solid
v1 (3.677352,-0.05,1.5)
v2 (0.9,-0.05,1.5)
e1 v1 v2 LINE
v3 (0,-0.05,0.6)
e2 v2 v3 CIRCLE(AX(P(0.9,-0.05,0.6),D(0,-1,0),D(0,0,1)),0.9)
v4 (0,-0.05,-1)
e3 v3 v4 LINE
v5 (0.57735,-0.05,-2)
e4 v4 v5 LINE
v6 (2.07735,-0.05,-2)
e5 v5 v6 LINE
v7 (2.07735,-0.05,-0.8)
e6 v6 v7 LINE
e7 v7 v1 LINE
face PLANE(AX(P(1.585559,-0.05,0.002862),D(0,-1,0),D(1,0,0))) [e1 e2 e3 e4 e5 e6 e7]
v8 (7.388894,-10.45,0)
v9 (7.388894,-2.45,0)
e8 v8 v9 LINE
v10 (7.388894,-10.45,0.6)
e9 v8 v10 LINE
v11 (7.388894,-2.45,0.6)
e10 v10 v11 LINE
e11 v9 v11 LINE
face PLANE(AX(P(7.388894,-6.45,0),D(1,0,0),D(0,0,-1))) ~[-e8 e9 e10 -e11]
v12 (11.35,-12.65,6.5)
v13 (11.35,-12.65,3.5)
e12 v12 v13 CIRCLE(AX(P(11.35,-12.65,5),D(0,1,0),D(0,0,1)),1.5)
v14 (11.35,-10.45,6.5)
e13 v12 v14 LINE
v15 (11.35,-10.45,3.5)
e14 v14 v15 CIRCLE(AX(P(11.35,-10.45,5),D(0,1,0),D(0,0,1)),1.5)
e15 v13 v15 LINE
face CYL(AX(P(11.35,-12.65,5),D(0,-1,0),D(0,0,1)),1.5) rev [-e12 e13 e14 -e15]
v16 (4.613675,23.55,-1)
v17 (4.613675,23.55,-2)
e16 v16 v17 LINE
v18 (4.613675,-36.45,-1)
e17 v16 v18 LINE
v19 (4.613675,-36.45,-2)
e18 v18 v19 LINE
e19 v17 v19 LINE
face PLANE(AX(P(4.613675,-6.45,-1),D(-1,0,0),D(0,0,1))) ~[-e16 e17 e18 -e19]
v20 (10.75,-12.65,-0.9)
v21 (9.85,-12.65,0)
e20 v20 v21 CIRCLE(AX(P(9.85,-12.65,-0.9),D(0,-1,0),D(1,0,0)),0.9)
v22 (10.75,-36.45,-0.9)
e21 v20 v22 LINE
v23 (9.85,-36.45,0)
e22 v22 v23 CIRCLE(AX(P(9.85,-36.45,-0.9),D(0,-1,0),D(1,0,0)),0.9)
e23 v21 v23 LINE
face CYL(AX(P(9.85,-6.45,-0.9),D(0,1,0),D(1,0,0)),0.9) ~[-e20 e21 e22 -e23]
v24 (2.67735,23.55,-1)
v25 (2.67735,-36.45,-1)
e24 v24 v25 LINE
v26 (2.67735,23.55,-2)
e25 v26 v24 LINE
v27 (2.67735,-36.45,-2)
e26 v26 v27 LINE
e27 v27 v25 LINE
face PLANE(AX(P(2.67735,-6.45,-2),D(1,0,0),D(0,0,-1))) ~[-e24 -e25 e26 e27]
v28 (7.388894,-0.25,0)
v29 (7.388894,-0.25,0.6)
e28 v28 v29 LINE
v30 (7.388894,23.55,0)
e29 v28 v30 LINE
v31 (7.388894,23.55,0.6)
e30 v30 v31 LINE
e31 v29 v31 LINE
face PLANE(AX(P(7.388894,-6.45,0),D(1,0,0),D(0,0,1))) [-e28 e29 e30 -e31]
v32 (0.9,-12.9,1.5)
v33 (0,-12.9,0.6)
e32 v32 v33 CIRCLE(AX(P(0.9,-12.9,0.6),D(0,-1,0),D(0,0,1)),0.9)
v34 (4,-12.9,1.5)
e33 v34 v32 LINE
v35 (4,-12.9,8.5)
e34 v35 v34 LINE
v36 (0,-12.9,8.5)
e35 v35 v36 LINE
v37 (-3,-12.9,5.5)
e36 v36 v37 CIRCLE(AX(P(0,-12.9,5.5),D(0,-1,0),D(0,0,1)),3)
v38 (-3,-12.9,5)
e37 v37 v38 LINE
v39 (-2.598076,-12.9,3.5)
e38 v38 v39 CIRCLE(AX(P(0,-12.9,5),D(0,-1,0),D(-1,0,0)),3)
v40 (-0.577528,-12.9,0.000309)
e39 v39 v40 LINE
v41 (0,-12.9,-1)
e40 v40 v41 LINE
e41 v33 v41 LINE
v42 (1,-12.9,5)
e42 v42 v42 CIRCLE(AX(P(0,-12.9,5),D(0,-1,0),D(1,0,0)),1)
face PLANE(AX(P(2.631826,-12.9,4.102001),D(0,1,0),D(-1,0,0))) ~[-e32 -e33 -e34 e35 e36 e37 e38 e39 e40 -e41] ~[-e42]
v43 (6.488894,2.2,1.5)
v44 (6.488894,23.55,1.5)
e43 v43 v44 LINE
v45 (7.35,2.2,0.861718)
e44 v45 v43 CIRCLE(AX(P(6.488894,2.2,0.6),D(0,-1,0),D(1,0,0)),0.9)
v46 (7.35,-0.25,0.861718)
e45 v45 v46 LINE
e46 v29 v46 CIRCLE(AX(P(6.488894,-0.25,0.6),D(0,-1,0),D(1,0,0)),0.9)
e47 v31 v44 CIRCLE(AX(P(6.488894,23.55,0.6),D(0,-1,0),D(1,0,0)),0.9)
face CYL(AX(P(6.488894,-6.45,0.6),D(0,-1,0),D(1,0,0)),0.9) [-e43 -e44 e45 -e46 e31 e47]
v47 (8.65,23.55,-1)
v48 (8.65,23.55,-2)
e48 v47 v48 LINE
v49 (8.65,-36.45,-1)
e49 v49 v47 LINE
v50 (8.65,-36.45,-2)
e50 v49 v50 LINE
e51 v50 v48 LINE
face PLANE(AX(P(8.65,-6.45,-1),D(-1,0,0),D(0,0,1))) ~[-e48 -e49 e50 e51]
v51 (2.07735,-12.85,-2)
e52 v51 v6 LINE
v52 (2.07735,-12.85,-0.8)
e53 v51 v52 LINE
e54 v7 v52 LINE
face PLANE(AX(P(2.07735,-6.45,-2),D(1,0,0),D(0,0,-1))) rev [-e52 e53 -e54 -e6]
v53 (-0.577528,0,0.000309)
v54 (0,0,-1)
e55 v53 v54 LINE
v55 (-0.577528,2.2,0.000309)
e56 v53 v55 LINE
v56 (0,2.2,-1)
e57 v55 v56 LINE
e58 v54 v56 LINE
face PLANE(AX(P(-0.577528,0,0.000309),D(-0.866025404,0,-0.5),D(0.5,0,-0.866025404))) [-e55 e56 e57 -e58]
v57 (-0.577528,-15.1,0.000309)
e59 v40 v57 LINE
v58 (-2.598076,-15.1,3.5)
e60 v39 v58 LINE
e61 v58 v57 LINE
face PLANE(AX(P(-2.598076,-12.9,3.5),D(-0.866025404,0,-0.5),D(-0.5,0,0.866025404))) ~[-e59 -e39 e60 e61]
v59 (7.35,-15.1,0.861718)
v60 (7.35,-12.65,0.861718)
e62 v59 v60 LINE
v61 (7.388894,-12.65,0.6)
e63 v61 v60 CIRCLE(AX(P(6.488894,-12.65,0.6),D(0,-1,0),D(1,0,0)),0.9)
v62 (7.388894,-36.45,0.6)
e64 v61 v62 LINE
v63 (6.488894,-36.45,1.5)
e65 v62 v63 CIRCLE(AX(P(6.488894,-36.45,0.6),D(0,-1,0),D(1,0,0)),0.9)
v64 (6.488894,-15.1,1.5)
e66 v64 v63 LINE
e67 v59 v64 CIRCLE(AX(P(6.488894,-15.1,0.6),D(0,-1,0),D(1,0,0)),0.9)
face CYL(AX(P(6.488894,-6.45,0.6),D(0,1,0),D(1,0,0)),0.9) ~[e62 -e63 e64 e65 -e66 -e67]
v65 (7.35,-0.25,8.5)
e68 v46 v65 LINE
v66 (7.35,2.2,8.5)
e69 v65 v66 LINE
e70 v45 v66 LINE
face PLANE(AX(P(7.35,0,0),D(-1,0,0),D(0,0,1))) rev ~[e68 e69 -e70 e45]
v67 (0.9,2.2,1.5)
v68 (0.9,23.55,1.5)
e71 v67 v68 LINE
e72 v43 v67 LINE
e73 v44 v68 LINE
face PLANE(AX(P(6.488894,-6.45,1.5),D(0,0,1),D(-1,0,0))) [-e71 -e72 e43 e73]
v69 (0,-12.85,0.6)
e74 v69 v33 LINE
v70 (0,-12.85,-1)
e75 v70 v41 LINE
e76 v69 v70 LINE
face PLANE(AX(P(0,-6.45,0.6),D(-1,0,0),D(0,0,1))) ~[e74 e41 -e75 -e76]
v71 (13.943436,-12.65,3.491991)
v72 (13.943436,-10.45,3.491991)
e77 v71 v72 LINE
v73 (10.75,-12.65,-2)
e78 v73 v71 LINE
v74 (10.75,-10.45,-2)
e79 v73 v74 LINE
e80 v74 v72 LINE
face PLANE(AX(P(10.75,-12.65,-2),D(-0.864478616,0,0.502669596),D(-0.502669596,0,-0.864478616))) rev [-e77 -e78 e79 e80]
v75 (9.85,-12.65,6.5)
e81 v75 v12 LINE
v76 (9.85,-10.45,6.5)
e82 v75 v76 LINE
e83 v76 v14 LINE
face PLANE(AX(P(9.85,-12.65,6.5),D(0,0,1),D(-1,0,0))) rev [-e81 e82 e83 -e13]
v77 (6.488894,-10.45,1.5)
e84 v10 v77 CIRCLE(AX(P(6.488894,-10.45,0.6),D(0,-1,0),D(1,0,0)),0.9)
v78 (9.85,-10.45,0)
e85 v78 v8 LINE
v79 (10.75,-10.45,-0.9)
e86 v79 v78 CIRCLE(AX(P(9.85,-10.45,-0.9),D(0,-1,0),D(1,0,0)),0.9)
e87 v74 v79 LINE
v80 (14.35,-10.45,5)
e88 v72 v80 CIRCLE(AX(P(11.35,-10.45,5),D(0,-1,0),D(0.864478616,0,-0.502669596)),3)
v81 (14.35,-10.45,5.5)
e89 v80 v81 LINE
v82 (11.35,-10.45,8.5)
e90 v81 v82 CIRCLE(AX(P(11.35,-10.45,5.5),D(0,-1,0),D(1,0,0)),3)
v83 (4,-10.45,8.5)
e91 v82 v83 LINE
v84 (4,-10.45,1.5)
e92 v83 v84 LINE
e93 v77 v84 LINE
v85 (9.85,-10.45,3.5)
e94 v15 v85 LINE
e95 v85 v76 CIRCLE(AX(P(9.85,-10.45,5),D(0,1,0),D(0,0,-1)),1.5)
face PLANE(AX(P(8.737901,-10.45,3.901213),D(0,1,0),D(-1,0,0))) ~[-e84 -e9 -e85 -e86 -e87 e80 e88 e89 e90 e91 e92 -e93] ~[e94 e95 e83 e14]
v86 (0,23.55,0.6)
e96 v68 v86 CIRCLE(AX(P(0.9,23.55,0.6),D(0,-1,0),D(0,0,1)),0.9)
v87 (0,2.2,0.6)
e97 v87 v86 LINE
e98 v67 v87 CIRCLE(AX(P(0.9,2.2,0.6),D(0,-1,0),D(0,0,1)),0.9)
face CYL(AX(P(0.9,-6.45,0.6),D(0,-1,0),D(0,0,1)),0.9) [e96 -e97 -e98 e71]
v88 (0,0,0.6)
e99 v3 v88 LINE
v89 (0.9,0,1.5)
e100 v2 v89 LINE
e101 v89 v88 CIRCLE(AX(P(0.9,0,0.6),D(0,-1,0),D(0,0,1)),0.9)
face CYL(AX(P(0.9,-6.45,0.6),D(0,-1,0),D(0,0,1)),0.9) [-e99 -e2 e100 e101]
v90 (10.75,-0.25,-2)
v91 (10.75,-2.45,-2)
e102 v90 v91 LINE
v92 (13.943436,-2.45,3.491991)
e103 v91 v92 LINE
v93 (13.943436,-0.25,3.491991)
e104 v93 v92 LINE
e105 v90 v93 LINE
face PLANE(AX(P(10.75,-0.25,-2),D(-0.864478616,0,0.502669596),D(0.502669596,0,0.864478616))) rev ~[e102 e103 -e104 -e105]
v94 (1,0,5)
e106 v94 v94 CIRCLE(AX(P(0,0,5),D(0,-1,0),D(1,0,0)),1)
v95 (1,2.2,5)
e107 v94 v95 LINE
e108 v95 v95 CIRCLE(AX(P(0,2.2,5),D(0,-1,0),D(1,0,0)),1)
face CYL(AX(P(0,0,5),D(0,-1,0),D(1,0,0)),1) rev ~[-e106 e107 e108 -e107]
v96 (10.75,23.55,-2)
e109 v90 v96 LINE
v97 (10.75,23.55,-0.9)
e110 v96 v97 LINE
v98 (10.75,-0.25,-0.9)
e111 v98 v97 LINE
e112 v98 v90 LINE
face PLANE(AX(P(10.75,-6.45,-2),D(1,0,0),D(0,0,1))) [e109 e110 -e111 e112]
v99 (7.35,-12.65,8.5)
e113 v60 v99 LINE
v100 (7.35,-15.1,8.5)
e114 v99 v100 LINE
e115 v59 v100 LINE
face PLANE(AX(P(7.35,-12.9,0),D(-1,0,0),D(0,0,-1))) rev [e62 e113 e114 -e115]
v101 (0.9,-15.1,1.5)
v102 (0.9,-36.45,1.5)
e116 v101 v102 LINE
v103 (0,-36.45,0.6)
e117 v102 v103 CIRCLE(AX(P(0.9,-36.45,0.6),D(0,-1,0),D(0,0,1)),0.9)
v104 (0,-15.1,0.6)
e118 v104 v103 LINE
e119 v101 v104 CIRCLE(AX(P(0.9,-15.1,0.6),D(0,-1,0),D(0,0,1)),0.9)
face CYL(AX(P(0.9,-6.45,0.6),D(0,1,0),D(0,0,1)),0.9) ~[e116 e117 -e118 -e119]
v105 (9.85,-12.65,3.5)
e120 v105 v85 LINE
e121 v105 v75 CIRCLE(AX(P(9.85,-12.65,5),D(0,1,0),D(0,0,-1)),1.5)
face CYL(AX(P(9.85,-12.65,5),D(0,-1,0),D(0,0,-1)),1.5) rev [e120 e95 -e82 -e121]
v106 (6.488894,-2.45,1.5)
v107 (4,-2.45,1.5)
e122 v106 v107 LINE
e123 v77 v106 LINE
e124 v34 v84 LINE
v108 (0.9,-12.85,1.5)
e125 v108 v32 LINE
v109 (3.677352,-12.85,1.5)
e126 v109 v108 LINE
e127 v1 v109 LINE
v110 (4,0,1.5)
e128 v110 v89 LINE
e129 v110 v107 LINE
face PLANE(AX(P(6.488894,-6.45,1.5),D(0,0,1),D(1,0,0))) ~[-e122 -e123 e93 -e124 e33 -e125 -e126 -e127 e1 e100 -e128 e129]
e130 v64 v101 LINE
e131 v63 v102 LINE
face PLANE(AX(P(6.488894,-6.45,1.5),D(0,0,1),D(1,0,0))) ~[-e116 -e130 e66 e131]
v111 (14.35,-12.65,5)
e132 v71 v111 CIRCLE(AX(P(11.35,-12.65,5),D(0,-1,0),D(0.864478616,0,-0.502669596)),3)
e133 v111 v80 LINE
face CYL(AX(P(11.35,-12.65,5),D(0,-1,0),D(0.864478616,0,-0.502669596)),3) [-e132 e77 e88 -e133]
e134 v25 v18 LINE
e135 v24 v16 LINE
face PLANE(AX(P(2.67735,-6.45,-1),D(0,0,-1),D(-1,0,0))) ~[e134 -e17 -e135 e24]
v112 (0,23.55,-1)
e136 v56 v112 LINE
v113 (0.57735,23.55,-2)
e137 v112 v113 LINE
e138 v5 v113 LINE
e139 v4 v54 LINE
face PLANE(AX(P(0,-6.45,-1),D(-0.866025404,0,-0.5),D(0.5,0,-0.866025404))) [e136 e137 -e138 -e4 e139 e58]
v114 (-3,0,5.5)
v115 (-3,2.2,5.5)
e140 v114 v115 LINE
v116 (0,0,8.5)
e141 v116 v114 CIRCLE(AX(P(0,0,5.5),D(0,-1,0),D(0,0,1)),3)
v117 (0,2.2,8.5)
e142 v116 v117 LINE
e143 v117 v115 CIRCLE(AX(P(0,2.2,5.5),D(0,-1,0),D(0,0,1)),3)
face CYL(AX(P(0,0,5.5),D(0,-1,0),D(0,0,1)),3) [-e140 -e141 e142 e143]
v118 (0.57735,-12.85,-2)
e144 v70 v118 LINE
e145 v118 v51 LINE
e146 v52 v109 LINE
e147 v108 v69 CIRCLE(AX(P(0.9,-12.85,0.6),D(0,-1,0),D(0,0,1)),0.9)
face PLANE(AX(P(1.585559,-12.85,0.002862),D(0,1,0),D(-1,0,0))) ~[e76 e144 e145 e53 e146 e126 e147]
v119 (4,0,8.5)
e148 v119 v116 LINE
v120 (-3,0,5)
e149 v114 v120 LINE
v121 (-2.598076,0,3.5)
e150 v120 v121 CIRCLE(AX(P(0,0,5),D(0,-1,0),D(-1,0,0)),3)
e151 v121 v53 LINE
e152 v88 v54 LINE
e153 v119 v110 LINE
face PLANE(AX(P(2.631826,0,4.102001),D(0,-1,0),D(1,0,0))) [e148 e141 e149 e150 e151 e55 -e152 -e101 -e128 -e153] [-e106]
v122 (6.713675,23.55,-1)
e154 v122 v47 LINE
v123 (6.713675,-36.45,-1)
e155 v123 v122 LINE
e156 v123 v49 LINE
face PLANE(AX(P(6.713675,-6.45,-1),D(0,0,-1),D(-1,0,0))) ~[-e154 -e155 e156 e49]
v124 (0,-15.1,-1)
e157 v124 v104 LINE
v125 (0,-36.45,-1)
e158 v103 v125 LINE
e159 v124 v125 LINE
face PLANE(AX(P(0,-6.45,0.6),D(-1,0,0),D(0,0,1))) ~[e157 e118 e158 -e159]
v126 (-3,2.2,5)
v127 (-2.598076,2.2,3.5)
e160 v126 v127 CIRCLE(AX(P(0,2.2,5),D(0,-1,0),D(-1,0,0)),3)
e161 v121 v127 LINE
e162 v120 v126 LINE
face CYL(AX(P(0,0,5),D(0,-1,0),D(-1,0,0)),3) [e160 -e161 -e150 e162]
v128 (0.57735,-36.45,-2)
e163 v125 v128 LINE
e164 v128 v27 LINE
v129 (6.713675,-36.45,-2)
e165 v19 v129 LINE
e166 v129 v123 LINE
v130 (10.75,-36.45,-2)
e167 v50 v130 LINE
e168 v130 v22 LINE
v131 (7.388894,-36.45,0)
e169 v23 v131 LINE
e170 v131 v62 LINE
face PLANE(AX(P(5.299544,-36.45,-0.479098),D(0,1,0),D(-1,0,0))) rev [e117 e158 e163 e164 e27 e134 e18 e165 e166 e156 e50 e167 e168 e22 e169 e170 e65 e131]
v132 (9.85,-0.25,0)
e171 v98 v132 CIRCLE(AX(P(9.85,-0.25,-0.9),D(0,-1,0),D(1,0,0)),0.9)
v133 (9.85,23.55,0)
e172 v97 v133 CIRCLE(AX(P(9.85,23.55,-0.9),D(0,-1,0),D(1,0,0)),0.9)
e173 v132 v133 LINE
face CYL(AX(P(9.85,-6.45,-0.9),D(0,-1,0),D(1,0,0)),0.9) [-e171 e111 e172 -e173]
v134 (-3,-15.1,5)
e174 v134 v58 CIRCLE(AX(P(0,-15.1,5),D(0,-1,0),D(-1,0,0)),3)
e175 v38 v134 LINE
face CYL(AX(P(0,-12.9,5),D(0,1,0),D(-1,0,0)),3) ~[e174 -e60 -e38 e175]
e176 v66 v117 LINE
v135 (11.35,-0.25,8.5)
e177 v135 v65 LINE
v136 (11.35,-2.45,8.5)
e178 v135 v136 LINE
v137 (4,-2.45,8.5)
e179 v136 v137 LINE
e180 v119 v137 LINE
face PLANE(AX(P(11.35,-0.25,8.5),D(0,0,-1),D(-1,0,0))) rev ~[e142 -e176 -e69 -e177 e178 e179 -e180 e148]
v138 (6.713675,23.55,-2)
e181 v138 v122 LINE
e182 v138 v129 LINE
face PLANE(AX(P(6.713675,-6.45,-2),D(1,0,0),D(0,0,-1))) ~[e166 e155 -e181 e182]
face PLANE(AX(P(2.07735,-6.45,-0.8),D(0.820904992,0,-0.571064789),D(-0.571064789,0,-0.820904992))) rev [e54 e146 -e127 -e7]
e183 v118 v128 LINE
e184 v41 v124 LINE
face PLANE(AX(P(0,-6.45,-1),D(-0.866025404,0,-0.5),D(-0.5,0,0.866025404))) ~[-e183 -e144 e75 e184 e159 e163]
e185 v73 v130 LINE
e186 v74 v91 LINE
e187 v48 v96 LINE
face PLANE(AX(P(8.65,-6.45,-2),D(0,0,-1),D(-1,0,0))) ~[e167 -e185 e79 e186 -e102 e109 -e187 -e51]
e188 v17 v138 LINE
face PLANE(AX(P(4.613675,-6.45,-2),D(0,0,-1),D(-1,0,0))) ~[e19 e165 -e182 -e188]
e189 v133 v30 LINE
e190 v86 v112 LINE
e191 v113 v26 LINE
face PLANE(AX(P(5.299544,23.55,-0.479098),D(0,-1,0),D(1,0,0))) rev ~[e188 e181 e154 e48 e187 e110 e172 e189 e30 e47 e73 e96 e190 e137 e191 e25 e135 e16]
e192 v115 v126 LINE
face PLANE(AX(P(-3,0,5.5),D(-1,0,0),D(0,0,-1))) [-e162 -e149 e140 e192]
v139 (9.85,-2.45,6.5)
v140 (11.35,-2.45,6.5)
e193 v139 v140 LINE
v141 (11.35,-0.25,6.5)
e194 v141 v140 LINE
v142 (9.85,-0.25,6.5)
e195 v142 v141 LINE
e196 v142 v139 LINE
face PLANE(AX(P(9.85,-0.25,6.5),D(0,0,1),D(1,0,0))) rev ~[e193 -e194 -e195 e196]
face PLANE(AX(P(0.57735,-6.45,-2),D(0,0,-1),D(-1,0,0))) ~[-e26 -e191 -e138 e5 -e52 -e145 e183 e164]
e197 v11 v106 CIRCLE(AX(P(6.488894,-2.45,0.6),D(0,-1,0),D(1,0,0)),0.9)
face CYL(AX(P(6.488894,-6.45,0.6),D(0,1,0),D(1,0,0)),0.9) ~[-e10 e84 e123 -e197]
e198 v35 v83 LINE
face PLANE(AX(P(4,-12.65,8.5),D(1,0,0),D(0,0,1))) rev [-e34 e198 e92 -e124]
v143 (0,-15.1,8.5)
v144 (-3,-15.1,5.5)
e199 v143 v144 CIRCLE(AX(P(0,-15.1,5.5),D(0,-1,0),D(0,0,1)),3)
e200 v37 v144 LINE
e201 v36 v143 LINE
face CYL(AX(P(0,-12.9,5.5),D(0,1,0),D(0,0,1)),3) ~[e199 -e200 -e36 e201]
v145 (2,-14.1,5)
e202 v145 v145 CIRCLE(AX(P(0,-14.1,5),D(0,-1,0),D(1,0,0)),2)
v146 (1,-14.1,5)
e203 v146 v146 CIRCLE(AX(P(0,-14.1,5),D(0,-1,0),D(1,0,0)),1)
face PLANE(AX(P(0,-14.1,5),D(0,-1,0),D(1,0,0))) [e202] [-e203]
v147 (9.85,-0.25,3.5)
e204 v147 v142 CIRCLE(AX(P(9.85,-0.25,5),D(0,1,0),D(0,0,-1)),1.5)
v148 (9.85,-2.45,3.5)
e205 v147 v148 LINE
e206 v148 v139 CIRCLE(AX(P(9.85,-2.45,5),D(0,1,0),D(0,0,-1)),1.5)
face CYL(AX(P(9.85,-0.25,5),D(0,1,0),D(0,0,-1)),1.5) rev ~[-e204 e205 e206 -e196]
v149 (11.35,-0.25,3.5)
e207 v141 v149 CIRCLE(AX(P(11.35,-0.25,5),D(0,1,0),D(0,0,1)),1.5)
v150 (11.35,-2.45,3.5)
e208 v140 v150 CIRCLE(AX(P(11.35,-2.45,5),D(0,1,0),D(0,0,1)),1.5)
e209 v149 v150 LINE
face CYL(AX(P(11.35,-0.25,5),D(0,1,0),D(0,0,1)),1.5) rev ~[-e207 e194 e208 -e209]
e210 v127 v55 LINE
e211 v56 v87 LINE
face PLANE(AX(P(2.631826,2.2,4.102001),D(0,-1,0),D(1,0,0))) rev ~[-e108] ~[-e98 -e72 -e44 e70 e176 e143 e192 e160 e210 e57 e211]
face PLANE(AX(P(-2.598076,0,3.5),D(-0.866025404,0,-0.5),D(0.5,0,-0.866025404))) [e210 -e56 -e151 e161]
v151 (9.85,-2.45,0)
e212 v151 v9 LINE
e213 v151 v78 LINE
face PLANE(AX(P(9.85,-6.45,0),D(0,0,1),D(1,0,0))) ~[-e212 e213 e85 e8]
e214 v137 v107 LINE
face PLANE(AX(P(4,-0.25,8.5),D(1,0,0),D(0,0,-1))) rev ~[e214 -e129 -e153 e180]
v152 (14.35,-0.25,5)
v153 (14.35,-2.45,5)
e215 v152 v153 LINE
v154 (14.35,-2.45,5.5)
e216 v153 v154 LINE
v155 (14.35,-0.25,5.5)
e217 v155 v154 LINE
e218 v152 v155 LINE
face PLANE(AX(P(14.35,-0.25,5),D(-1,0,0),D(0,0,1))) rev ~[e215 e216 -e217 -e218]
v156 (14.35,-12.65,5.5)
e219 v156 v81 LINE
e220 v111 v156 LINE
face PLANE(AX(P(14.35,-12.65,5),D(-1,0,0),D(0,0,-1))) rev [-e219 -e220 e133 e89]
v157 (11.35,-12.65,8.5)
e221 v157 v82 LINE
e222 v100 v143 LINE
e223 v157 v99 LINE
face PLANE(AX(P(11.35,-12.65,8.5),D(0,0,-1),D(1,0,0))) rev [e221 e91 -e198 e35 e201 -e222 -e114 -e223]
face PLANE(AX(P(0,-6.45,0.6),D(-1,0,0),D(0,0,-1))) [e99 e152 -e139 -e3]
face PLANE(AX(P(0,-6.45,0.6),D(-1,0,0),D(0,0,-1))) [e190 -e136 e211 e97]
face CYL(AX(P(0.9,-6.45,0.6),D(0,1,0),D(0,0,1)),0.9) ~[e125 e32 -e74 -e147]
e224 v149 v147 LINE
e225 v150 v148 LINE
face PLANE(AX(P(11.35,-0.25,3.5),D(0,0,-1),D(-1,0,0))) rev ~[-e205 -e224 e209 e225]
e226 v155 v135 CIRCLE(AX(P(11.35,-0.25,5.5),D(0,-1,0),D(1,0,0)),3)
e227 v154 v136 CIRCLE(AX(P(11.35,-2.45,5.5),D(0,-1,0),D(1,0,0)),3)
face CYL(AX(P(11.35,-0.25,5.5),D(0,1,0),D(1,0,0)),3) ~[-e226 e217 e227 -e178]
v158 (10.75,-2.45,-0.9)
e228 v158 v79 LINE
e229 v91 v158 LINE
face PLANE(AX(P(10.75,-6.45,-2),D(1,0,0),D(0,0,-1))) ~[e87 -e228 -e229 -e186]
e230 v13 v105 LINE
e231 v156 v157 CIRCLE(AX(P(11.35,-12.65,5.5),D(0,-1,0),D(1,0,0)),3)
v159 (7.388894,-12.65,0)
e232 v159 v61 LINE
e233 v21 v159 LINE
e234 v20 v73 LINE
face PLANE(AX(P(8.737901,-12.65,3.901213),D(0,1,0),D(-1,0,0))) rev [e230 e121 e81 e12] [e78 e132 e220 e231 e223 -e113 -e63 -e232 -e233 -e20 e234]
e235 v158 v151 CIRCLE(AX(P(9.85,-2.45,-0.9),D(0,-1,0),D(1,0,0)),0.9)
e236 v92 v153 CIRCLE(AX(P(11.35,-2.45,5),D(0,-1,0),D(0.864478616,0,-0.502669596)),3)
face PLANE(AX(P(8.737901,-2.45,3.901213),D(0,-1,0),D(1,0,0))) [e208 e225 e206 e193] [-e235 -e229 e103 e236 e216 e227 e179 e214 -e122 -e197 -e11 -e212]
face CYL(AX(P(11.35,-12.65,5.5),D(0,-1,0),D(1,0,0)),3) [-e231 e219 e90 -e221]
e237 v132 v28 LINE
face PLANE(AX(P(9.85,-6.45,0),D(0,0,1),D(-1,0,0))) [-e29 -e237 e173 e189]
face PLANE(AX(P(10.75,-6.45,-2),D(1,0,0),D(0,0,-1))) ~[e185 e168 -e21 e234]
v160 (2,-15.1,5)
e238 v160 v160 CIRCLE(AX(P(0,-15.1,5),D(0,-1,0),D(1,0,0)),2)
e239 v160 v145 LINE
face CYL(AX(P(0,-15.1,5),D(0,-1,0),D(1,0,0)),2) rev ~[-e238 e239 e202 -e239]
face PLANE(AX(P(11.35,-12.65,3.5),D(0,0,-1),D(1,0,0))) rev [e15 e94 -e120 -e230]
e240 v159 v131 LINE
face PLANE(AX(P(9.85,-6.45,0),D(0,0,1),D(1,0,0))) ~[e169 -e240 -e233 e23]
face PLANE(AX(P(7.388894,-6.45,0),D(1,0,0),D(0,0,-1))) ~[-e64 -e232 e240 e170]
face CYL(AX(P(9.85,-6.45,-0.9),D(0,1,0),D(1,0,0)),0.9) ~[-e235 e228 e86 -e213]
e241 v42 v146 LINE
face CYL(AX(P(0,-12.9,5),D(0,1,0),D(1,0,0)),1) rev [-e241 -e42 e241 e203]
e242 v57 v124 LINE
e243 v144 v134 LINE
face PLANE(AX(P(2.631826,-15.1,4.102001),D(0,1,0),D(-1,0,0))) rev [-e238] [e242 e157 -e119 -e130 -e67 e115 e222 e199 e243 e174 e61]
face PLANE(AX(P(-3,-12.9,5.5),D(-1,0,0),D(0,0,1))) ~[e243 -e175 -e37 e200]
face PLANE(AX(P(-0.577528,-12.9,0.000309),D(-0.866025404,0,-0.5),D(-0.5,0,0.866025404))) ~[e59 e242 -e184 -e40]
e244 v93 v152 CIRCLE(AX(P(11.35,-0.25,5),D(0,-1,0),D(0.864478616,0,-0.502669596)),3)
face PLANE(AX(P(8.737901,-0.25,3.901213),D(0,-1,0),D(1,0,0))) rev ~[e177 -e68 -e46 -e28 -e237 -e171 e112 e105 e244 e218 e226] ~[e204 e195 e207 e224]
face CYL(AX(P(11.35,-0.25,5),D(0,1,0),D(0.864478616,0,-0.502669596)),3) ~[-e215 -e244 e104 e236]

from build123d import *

# Parameters (mm, degrees)
F1_R      = 1
F2_DEPTH  = 2.2
F4_DEPTH  = 0.25
F6_DEPTH  = 2.2
F9_DEPTH  = 30
F11_DEPTH = 6.4
F13_R     = 2
F13_R_2   = 1
F14_DEPTH = 1


# Not quite as in the source:
# - a feature names something its author has since deleted; it is built from what else it names


with BuildPart() as f2:
    # F1 (on Front) → F2 (new body)
    with BuildSketch(Plane.XZ):
        with BuildLine():
            Line((7.35, 2), (7.35, 8.5))
            Line((7.35, 8.5), (0, 8.5))
            ThreePointArc((0, 8.5), (-2.1213203436, 7.6213203436), (-3, 5.5))
            Line((-3, 5.5), (-3, 5))
            ThreePointArc((-3, 5), (-2.8977774789, 4.2235428647), (-2.5980762114, 3.5))
            Line((-2.5980762114, 3.5), (-0.5775284417, 0.0003086038))
            Line((-0.5775284417, 0.0003086038), (0, -1))
            Line((0, -1), (0, 0))
            Line((0, 0), (2, 0))
            Line((2, 0), (7.35, 0))
            Line((7.35, 0), (7.35, 2))
        make_face()
        with Locations((0, 5)):
            Circle(F1_R, mode=Mode.SUBTRACT)
    extrude(amount=-F2_DEPTH)

    # F3 (on Front) → F4 (join)
    with BuildSketch(Plane.XZ):
        Polygon((7.35, 8.5), (4, 8.5), (4, 2), (4, 0), (7.35, 0), (7.35, 2), align=None)
    extrude(amount=F4_DEPTH)

    # F5 (on face) → F6 (join)
    with BuildSketch(Plane.XZ.offset(0.25)):
        with BuildLine():
            ThreePointArc((13.9434358481, 3.491991213), (14.2465762155, 4.2190734812), (14.35, 5))
            Line((14.35, 5), (14.35, 5.5))
            ThreePointArc((14.35, 5.5), (13.4713203436, 7.6213203436), (11.35, 8.5))
            Line((11.35, 8.5), (4, 8.5))
            Line((4, 8.5), (4, 2))
            Line((4, 2), (4, 0))
            Line((4, 0), (7.3888939805, 0))
            Line((7.3888939805, 0), (10.75, -1))
            Line((10.75, -1), (10.75, -2))
            Line((10.75, -2), (13.9434358481, 3.491991213))
        make_face()
        with BuildLine():
            Line((11.35, 3.5), (9.85, 3.5))
            ThreePointArc((9.85, 3.5), (8.35, 5), (9.85, 6.5))
            Line((9.85, 6.5), (11.35, 6.5))
            ThreePointArc((11.35, 6.5), (12.85, 5), (11.35, 3.5))
        make_face(mode=Mode.SUBTRACT)
    extrude(amount=F6_DEPTH)

    # F8 (on offset) → F9 (join)
    with BuildSketch(Plane.XZ.offset(6.45)):
        with BuildLine():
            Line((10.75, -2), (10.75, -1))
            Line((10.75, -1), (10.75, -0.9))
            ThreePointArc((10.75, -0.9), (10.4863961031, -0.2636038969), (9.85, 0))
            Line((9.85, 0), (7.3888939805, 0))
            Line((7.3888939805, 0), (7.3888939805, 0.6))
            ThreePointArc((7.3888939805, 0.6), (7.1252900836, 1.2363961031), (6.4888939805, 1.5))
            Line((6.4888939805, 1.5), (0.9, 1.5))
            ThreePointArc((0.9, 1.5), (0.2636038969, 1.2363961031), (0, 0.6))
            Line((0, 0.6), (0, -1))
            Line((0, -1), (0.5773502692, -2))
            Line((0.5773502692, -2), (2.6773502692, -2))
            Line((2.6773502692, -2), (2.6773502692, -1))
            Line((2.6773502692, -1), (4.6136751346, -1))
            Line((4.6136751346, -1), (4.6136751346, -2))
            Line((4.6136751346, -2), (6.7136751346, -2))
            Line((6.7136751346, -2), (6.7136751346, -1))
            Line((6.7136751346, -1), (8.65, -1))
            Line((8.65, -1), (8.65, -2))
            Line((8.65, -2), (10.75, -2))
        make_face()
    extrude(amount=-F9_DEPTH)

    # F10 (on offset) → F11 (cut)
    with BuildSketch(Plane.XZ.offset(6.45)):
        with BuildLine():
            ThreePointArc((0.9, 1.5), (0.2636038969, 1.2363961031), (0, 0.6))
            Line((0, 0.6), (0, -1))
            Line((0, -1), (0.5773502692, -2))
            Line((0.5773502692, -2), (2.0773502692, -2))
            Line((2.0773502692, -2), (2.0773502692, -0.8))
            Line((2.0773502692, -0.8), (3.6773515204, 1.5))
            Line((3.6773515204, 1.5), (0.9, 1.5))
        make_face()
    extrude(amount=-F11_DEPTH, mode=Mode.SUBTRACT)

    # F12: F2 across plane


with BuildPart() as f2_1:
    add(f2.part)
    add(f2.part.mirror(Plane(origin=(8.5554041441, -6.45, 4.0498921838), x_dir=(1, 0, 0), z_dir=(0, -1, 0))))

    # F13 (on face) → F14 (cut)
    with BuildSketch(Plane.XZ.offset(15.1)):
        with Locations((0, 5)):
            Circle(F13_R)
        with Locations((0, 5)):
            Circle(F13_R_2, mode=Mode.SUBTRACT)
    extrude(amount=-F14_DEPTH, mode=Mode.SUBTRACT)


solid = f2_1.part
